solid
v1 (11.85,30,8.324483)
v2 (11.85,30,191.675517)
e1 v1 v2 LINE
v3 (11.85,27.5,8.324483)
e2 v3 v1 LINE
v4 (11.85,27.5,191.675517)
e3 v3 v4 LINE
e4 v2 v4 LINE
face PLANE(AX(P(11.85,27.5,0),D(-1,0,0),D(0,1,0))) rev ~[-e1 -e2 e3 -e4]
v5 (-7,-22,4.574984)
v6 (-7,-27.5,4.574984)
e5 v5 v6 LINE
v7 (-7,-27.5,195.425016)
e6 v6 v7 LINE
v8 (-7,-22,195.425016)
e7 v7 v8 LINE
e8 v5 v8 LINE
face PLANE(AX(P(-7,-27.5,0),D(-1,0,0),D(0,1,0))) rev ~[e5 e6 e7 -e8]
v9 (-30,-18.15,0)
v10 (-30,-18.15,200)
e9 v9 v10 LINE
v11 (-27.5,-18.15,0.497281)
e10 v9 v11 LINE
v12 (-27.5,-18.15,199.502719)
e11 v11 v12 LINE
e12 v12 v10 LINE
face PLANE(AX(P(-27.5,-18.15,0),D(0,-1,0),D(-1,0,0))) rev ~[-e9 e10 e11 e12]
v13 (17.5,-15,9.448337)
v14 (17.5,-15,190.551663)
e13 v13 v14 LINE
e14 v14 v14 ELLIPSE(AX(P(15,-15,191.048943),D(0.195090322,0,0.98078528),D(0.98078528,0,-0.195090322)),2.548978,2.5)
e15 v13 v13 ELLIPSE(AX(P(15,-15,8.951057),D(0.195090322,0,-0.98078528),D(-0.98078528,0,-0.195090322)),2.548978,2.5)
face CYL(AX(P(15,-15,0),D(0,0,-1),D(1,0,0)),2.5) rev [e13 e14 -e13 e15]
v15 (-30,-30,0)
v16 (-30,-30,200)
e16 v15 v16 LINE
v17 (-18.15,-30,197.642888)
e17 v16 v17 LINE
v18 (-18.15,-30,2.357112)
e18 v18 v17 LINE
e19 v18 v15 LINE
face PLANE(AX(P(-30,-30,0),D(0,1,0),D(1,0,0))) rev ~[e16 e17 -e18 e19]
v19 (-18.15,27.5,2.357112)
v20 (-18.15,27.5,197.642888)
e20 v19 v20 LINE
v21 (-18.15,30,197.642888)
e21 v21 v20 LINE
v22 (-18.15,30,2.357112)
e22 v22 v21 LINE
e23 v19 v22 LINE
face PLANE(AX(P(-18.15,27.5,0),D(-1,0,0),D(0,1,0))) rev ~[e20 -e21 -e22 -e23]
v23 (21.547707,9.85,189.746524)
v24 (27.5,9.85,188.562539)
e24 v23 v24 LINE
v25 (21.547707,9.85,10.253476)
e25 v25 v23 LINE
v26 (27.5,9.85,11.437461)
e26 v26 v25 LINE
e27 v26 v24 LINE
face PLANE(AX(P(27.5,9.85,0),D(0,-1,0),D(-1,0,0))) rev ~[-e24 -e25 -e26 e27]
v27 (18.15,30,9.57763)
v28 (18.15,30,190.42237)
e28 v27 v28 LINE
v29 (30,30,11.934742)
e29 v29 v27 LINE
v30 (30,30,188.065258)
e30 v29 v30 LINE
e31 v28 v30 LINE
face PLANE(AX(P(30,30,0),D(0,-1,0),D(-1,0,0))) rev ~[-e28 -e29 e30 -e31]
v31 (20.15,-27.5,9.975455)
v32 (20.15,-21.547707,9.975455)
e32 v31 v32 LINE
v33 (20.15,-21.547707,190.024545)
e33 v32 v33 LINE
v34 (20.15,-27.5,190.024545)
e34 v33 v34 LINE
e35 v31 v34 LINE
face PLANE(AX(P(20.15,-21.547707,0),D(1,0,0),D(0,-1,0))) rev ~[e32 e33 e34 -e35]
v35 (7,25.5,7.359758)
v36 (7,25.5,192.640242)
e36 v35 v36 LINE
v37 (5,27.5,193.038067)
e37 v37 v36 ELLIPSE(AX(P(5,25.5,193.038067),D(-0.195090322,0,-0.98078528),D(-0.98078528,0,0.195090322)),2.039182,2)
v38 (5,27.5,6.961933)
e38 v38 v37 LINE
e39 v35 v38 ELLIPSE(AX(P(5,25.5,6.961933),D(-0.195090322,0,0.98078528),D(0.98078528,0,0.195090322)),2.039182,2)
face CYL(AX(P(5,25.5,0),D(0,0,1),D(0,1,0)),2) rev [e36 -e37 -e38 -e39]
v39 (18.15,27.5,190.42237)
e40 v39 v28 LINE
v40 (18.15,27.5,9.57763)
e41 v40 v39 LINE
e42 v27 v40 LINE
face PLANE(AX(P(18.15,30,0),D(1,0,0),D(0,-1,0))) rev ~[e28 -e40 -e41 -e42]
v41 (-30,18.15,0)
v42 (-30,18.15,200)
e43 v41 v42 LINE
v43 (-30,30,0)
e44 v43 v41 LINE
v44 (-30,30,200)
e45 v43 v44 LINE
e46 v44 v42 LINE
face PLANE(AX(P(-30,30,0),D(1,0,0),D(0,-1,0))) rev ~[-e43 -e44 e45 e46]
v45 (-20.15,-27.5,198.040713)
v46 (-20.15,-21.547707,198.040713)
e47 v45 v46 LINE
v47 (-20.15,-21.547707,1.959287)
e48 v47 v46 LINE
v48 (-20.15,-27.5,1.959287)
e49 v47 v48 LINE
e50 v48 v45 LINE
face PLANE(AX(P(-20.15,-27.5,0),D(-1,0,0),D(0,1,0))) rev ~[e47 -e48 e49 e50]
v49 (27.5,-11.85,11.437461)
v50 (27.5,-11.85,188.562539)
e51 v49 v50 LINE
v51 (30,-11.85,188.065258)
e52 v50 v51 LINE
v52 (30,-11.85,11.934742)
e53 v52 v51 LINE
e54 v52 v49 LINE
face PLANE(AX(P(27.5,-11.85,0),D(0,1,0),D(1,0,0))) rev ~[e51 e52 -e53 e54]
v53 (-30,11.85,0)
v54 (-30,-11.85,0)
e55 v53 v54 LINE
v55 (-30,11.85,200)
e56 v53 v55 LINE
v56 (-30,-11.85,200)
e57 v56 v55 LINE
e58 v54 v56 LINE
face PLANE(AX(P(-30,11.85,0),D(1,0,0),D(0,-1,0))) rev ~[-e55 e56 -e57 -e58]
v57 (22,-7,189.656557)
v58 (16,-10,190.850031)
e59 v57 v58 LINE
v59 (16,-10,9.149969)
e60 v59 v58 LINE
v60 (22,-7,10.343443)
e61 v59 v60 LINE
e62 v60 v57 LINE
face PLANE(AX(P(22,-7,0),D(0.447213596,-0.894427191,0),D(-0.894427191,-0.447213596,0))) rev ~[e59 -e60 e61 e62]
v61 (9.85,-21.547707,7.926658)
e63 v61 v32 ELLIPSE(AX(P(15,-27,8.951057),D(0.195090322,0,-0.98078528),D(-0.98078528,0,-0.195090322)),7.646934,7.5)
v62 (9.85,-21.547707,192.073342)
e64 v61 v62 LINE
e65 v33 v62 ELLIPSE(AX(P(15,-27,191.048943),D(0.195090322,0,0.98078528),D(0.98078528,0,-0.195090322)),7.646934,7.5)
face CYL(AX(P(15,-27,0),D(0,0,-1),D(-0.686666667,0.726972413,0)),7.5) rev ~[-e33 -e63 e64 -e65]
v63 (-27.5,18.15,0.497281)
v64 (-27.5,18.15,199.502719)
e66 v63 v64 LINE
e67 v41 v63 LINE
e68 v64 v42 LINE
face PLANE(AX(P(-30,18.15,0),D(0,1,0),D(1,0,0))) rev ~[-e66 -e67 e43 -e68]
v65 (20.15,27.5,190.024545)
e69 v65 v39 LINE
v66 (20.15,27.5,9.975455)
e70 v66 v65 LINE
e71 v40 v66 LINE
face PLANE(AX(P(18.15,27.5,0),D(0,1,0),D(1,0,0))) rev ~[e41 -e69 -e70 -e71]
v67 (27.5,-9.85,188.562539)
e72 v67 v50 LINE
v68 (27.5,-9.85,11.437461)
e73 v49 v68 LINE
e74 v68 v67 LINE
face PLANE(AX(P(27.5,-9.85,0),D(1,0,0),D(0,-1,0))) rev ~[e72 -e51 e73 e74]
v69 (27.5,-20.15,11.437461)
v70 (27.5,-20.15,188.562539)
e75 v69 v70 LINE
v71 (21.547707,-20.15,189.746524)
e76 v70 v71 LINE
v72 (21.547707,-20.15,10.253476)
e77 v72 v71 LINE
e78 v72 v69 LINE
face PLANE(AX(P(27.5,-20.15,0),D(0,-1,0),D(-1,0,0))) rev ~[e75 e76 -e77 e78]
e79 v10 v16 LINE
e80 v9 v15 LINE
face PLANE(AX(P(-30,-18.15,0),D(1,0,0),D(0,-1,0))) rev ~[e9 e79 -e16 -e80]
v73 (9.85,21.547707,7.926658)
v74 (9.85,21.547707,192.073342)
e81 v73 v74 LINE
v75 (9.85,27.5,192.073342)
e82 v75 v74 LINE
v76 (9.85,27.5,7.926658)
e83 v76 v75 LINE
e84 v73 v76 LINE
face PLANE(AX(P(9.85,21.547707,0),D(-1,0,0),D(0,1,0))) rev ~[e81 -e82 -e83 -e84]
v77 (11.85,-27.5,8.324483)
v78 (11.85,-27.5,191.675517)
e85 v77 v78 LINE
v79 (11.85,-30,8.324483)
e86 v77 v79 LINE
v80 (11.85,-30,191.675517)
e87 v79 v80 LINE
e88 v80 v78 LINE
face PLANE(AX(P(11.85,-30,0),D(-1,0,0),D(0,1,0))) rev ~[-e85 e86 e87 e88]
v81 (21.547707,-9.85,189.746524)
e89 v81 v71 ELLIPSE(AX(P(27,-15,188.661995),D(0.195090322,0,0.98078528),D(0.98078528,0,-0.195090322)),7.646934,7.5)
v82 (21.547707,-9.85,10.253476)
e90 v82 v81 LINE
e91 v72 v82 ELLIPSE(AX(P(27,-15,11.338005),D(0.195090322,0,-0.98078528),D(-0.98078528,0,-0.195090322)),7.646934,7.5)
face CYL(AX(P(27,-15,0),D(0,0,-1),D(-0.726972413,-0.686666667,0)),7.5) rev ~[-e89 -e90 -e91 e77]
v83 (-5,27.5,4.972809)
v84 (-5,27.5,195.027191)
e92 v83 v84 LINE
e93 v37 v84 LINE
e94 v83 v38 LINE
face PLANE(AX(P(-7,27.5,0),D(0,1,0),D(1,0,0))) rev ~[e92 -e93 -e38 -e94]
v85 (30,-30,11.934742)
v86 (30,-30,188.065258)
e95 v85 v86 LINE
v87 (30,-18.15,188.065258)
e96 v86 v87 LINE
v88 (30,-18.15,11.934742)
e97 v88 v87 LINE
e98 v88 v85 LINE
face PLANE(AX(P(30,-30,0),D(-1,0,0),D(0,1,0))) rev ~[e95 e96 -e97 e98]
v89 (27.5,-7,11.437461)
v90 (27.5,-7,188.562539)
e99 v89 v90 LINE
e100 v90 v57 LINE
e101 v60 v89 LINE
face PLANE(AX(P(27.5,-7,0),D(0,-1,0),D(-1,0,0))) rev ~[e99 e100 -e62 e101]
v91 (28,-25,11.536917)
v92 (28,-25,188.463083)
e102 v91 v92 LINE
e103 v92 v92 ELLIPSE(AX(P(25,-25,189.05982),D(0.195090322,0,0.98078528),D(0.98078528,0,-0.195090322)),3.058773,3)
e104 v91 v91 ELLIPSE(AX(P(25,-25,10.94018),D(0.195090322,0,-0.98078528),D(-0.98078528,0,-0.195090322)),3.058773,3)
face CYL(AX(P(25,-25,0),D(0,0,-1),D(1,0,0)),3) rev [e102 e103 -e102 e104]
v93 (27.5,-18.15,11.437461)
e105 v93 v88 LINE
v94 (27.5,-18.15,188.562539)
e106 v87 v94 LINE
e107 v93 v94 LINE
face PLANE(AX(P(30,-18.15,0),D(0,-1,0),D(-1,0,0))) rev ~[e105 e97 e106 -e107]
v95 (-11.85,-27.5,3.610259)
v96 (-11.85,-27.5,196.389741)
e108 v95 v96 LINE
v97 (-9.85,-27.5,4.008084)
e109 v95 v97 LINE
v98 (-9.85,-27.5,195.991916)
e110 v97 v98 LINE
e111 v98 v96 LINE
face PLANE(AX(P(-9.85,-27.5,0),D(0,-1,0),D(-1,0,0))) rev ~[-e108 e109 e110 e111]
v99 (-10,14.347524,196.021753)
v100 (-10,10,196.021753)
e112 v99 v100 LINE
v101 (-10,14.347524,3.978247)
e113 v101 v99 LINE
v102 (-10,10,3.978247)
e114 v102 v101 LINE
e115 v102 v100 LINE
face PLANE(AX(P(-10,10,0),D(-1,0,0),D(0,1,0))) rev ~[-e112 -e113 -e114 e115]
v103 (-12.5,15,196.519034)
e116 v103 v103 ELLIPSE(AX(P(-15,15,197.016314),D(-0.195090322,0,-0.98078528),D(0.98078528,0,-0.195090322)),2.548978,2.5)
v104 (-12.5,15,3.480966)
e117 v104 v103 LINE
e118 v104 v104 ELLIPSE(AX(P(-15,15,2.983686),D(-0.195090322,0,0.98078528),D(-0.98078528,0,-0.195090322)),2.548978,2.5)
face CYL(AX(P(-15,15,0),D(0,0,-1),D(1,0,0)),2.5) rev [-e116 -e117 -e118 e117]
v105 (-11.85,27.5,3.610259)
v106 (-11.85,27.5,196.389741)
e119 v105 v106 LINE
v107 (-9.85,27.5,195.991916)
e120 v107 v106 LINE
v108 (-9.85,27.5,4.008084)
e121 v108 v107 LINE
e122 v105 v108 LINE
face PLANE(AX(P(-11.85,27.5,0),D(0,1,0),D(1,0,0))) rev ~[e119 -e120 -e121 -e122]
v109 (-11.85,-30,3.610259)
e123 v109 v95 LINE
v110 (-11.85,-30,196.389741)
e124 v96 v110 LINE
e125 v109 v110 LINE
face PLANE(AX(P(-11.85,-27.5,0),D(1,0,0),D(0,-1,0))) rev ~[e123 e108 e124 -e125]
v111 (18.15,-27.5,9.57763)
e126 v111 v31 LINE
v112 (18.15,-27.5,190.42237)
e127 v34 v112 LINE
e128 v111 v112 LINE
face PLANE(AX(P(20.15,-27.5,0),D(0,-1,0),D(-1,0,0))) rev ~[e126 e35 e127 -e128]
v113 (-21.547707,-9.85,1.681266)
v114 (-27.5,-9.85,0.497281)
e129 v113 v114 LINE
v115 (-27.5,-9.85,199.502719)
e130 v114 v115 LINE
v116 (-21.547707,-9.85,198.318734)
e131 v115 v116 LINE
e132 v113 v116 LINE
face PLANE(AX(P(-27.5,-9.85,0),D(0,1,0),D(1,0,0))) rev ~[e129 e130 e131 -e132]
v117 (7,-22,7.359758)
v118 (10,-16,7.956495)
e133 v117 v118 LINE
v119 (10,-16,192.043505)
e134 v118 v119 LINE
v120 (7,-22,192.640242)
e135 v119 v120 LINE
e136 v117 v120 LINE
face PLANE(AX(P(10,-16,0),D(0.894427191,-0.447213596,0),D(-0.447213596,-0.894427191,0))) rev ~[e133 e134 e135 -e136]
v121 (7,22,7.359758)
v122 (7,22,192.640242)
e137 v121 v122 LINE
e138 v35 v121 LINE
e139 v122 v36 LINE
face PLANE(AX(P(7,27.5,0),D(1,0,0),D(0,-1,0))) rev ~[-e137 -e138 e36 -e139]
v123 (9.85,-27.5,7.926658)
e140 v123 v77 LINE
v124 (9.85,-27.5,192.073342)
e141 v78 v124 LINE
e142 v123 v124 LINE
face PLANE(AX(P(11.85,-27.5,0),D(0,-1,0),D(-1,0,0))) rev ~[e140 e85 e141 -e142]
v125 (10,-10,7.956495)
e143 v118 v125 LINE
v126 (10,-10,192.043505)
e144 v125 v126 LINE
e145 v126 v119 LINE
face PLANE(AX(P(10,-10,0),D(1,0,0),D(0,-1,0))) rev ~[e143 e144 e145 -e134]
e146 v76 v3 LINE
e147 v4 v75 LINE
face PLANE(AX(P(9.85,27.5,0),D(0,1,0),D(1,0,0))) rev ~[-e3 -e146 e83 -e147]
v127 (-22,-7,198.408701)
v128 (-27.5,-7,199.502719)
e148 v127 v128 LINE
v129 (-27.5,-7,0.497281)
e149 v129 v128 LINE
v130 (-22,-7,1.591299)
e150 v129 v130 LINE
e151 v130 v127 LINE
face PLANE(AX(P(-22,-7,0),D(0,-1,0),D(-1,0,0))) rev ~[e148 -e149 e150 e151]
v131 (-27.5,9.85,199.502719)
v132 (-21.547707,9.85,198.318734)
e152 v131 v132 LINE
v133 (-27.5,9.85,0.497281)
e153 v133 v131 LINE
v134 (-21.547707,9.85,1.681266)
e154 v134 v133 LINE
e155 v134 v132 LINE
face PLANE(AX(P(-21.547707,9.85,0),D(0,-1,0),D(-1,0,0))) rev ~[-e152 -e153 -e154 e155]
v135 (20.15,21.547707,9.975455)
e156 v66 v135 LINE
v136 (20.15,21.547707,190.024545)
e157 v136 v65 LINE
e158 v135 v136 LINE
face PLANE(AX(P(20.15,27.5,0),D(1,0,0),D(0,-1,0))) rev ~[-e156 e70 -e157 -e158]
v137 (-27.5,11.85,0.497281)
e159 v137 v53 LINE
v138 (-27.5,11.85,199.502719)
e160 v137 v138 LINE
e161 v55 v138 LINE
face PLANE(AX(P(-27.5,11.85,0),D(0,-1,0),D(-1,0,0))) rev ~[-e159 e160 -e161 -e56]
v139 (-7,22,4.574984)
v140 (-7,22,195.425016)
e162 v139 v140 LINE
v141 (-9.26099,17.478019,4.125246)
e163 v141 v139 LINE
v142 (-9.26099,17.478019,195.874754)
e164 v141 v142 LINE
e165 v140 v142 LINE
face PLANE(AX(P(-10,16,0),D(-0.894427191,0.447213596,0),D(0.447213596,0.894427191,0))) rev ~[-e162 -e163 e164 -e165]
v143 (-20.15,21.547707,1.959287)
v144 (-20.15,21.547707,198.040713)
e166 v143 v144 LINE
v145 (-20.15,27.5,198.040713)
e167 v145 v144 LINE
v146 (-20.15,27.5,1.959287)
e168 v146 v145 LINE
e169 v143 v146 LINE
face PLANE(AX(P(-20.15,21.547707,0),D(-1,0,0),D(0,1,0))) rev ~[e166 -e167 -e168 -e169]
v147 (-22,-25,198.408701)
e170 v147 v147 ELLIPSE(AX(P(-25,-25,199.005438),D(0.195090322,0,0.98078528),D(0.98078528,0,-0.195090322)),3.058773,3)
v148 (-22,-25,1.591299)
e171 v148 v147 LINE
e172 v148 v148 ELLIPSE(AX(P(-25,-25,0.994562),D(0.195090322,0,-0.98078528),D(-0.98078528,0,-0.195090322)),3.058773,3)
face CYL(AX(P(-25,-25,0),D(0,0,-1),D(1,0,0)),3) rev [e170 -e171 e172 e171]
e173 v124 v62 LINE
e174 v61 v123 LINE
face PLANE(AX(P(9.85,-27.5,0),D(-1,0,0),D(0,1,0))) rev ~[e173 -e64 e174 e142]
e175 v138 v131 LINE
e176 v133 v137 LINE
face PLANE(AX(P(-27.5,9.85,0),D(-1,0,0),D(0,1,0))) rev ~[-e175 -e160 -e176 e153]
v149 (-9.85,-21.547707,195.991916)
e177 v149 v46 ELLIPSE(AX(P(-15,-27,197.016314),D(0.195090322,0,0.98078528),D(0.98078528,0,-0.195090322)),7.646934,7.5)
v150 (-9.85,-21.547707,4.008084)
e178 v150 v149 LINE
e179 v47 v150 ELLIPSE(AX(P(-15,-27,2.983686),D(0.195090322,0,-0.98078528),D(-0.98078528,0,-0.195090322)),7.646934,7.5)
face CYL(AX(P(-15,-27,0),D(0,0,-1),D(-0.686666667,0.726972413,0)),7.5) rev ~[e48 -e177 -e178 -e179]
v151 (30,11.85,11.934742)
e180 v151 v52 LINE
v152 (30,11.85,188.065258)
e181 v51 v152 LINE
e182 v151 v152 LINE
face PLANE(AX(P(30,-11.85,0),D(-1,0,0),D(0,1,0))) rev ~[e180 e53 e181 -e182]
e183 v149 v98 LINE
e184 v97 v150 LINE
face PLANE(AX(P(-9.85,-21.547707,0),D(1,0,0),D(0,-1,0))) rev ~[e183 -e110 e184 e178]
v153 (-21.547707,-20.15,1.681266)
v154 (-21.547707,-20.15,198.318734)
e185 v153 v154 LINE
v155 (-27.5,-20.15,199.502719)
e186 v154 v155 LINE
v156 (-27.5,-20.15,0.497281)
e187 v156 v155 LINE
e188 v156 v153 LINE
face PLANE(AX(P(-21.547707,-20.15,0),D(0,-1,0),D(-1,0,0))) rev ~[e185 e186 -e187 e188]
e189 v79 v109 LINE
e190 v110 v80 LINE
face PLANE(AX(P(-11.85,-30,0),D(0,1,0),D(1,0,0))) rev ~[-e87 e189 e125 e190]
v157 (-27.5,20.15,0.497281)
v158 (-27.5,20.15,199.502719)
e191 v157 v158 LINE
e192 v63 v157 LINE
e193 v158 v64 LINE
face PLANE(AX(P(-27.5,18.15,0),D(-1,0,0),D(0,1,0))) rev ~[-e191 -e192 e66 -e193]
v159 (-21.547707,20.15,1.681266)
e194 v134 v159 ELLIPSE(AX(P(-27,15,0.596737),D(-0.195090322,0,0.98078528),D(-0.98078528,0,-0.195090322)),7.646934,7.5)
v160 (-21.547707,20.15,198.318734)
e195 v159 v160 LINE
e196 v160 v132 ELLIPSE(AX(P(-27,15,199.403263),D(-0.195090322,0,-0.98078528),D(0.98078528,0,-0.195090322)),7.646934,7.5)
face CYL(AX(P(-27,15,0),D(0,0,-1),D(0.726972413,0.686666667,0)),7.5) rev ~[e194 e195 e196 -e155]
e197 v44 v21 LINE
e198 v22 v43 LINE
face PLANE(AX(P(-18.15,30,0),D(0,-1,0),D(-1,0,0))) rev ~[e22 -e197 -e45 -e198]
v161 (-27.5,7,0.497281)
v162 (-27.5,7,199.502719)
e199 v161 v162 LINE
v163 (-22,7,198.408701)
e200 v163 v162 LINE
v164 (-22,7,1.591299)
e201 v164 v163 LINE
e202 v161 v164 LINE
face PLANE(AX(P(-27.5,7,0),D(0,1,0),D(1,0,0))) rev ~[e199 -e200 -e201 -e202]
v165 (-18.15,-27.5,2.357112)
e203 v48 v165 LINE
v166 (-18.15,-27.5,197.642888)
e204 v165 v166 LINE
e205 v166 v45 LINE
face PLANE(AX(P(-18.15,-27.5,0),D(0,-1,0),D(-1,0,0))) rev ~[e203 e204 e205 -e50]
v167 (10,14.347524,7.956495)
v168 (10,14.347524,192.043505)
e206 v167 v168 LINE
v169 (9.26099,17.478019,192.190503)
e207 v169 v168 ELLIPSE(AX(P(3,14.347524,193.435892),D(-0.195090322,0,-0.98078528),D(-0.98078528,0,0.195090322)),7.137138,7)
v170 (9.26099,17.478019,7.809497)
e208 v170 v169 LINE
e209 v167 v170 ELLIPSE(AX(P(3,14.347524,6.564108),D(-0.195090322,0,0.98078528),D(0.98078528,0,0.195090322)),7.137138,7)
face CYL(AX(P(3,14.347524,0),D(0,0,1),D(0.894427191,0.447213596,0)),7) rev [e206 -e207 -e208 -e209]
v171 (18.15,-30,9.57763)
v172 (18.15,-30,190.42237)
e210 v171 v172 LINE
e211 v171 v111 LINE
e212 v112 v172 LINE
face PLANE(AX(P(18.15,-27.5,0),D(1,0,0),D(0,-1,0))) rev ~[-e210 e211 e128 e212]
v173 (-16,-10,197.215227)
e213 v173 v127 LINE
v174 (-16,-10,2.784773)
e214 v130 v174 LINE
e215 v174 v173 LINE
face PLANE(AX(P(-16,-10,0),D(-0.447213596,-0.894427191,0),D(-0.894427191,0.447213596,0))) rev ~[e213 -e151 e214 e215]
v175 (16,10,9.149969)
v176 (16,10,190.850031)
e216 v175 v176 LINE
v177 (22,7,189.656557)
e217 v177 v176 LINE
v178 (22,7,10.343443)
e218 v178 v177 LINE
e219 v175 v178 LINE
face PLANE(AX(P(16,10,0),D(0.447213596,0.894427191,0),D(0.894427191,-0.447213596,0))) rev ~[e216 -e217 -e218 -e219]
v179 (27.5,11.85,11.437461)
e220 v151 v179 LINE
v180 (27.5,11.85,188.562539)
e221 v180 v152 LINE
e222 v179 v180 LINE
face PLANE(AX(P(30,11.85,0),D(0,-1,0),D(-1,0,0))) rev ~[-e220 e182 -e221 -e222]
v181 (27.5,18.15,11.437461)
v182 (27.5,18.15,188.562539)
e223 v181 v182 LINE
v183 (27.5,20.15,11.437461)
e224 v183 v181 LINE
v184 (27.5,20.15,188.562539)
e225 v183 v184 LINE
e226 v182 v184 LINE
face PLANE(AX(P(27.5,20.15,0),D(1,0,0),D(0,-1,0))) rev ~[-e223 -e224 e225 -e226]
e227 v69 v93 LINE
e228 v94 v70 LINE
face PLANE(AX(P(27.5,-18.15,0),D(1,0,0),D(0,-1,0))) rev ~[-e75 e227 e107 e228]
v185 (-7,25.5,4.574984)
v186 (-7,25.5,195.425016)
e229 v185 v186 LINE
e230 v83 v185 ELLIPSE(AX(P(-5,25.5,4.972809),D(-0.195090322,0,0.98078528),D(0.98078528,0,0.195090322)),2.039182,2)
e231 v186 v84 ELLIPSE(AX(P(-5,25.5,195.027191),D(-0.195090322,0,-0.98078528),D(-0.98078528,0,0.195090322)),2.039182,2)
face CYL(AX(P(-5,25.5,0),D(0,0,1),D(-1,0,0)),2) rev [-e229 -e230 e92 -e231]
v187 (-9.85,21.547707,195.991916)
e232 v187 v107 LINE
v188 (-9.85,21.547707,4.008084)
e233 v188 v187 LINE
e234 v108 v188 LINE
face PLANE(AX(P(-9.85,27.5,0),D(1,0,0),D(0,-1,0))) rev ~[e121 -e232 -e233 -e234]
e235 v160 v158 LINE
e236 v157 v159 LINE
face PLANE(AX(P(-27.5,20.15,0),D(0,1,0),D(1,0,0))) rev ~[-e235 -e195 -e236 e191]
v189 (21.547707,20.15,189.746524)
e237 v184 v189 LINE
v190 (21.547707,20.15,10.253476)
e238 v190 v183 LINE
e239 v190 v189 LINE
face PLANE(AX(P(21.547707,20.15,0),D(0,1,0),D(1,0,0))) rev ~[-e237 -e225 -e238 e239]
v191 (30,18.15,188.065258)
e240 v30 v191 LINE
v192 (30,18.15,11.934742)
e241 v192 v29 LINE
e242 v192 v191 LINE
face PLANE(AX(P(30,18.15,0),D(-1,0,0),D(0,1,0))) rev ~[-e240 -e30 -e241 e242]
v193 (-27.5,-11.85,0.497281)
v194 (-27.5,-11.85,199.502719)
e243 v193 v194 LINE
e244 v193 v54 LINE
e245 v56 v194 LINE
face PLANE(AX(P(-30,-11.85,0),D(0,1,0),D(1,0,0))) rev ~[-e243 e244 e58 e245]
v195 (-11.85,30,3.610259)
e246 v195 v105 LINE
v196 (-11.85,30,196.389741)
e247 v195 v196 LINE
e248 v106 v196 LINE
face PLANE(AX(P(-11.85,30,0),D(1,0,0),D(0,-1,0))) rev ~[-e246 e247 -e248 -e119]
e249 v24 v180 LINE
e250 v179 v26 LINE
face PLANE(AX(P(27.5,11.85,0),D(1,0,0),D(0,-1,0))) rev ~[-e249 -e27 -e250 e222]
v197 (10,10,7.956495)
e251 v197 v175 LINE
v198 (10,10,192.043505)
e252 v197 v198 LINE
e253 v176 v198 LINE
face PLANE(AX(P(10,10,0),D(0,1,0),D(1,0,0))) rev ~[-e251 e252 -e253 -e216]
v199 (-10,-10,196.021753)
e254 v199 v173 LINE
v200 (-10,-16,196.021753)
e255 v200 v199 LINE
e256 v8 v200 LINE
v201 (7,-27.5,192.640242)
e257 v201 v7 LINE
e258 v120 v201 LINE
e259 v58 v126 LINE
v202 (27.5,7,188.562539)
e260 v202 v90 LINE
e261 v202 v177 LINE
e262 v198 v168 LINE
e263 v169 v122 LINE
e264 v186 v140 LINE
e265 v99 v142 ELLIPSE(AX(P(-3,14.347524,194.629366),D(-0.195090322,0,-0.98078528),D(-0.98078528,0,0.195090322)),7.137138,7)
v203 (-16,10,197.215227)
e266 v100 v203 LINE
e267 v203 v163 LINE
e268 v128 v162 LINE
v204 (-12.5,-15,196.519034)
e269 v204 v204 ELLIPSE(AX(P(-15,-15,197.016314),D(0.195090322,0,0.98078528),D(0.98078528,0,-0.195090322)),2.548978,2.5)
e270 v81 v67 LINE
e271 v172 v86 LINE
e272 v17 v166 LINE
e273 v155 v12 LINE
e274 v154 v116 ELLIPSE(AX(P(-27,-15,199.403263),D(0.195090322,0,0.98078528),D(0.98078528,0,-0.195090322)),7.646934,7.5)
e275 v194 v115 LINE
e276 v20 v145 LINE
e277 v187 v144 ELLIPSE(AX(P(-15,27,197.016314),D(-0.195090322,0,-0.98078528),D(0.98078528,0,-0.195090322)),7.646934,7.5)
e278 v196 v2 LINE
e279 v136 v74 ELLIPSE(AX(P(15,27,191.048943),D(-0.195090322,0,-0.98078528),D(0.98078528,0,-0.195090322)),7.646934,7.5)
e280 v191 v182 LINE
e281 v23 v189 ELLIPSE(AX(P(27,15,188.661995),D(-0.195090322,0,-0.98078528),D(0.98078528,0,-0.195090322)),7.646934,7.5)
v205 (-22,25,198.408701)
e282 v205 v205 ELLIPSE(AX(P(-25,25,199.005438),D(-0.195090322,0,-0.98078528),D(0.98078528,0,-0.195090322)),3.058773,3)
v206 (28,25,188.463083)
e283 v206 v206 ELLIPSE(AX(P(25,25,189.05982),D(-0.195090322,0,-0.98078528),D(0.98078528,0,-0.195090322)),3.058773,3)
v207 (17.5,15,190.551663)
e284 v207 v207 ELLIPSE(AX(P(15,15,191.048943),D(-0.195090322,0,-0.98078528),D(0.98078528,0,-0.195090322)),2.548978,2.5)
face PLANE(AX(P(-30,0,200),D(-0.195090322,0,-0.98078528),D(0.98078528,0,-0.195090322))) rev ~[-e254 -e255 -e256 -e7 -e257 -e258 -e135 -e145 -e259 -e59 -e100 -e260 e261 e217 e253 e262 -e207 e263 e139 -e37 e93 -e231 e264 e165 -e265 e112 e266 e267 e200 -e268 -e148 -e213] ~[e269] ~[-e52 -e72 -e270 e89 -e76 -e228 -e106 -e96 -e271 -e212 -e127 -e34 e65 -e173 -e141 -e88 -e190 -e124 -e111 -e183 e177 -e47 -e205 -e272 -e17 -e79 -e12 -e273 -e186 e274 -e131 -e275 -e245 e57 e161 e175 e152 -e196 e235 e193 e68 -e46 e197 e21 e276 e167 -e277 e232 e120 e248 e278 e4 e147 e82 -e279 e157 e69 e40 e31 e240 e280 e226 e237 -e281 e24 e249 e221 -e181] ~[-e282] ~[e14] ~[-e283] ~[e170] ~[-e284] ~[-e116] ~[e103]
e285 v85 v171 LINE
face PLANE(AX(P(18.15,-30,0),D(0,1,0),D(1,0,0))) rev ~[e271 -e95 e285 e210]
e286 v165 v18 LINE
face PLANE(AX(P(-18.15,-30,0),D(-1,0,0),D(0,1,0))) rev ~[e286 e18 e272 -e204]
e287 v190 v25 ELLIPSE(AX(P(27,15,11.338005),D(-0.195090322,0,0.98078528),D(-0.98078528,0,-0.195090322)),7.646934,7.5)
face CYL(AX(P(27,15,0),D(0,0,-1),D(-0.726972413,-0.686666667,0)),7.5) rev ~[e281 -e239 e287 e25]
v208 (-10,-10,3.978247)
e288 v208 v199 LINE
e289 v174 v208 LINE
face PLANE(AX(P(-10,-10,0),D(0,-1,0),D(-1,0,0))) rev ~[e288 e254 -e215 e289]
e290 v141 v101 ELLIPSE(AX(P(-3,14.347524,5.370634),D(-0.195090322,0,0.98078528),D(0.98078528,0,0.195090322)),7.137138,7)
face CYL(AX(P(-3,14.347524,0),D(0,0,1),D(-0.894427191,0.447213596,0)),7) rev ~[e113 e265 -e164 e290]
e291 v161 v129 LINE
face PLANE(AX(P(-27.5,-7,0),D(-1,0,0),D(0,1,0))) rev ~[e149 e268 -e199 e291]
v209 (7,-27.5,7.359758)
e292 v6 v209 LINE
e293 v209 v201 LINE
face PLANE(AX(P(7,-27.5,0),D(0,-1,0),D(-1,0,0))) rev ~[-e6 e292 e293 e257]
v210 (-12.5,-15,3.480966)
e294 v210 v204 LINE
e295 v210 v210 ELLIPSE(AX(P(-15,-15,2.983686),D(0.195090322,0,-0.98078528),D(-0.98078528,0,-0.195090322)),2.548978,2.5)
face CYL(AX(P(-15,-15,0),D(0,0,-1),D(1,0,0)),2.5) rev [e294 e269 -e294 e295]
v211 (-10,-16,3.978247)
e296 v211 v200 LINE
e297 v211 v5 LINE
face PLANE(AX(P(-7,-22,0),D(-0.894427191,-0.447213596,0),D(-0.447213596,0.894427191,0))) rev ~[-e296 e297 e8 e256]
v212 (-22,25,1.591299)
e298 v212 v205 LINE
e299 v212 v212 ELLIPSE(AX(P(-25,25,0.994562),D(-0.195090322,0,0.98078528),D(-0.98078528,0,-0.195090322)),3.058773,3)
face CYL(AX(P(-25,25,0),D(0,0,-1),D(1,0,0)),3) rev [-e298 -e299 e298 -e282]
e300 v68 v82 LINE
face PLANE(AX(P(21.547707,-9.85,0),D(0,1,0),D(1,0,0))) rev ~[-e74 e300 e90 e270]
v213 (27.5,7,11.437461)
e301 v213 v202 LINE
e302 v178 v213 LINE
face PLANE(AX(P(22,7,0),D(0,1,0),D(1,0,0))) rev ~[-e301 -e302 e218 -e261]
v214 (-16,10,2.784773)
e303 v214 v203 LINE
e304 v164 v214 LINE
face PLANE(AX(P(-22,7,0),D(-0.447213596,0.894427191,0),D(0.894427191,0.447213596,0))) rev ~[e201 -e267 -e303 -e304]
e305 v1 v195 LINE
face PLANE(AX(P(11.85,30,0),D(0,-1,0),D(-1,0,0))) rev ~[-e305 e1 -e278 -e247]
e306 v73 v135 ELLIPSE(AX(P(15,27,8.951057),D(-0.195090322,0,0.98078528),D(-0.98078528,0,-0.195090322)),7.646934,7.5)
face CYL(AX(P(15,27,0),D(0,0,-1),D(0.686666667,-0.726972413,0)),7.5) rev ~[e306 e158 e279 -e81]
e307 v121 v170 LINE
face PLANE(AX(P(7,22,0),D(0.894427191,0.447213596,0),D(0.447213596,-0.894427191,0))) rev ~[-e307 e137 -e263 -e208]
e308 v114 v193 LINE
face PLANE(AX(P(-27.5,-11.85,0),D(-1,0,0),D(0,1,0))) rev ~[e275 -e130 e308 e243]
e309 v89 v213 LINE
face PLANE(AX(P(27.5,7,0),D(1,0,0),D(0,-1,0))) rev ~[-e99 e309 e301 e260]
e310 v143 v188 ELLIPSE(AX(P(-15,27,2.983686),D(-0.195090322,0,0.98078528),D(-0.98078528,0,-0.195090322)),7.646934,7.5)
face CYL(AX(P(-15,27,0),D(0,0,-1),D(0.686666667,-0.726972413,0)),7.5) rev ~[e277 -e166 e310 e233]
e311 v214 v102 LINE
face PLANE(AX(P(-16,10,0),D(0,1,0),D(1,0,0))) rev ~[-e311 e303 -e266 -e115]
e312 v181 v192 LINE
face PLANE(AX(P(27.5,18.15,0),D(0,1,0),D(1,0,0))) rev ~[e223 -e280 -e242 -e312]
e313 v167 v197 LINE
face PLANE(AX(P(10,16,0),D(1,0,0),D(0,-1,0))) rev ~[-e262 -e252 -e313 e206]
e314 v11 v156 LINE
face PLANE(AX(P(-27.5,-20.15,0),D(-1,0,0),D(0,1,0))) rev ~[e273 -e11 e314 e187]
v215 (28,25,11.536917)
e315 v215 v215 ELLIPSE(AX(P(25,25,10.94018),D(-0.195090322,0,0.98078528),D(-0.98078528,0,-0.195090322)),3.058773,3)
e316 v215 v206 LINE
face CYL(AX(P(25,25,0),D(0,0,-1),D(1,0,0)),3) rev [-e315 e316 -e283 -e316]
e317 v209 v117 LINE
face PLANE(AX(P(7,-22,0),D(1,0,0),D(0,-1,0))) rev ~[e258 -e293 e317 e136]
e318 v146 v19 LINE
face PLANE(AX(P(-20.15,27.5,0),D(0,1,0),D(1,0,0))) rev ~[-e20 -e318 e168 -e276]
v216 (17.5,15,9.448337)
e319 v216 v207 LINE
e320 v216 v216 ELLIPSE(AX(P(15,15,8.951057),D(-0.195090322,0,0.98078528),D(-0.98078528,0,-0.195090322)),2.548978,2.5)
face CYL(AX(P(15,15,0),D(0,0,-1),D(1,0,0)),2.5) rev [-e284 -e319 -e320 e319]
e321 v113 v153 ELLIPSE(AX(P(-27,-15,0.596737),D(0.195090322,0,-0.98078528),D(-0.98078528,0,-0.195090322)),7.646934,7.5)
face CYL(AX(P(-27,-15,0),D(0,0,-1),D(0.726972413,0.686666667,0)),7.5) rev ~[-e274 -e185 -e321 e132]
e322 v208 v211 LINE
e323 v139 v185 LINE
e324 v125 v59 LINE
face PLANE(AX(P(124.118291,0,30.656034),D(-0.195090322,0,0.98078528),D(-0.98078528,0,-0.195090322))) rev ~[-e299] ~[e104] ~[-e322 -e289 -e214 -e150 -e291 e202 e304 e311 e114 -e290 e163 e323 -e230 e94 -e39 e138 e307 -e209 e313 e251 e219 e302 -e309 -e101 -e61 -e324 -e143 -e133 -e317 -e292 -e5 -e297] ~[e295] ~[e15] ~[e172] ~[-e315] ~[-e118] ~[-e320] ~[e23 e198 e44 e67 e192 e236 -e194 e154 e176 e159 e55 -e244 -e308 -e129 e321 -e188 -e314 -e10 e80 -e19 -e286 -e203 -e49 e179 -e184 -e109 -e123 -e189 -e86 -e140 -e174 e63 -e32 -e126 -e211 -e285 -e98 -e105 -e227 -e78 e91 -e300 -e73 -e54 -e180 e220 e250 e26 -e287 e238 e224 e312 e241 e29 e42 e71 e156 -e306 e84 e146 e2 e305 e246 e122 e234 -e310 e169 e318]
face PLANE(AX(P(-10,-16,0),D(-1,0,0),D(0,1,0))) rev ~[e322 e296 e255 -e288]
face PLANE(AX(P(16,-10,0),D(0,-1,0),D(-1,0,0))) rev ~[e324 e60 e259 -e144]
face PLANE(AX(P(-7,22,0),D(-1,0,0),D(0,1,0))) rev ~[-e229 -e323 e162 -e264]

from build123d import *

# Parameters (mm, degrees)
F0_R          = 3
F0_R_2        = 2.5
F1_DEPTH      = 200
F2_R          = 2
F3_R          = 7
F6_DEPTH      = 30
F6_DEPTH_BACK = 30


# Not quite as in the source:
# - a feature names something its author has since deleted; it is built from what else it names


with BuildPart() as f1:
    # F0 (on Top) → F1 (new body)
    with BuildSketch(Plane.XY):
        with BuildLine():
            Line((18.15, -30), (30, -30))
            Line((30, -30), (30, -18.15))
            Line((30, -18.15), (27.5, -18.15))
            Line((27.5, -18.15), (27.5, -20.15))
            Line((27.5, -20.15), (21.5477069044, -20.15))
            ThreePointArc((21.5477069044, -20.15), (19.5, -15), (21.5477069044, -9.85))
            Line((21.5477069044, -9.85), (27.5, -9.85))
            Line((27.5, -9.85), (27.5, -11.85))
            Line((27.5, -11.85), (30, -11.85))
            Line((30, -11.85), (30, 11.85))
            Line((30, 11.85), (27.5, 11.85))
            Line((27.5, 11.85), (27.5, 9.85))
            Line((27.5, 9.85), (21.5477069044, 9.85))
            ThreePointArc((21.5477069044, 9.85), (19.5, 15), (21.5477069044, 20.15))
            Line((21.5477069044, 20.15), (27.5, 20.15))
            Line((27.5, 20.15), (27.5, 18.15))
            Line((27.5, 18.15), (30, 18.15))
            Line((30, 18.15), (30, 30))
            Line((30, 30), (18.15, 30))
            Line((18.15, 30), (18.15, 27.5))
            Line((18.15, 27.5), (20.15, 27.5))
            Line((20.15, 27.5), (20.15, 21.5477069044))
            ThreePointArc((20.15, 21.5477069044), (15, 19.5), (9.85, 21.5477069044))
            Line((9.85, 21.5477069044), (9.85, 27.5))
            Line((9.85, 27.5), (11.85, 27.5))
            Line((11.85, 27.5), (11.85, 30))
            Line((11.85, 30), (-11.85, 30))
            Line((-11.85, 30), (-11.85, 27.5))
            Line((-11.85, 27.5), (-9.85, 27.5))
            Line((-9.85, 27.5), (-9.85, 21.5477069044))
            ThreePointArc((-9.85, 21.5477069044), (-15, 19.5), (-20.15, 21.5477069044))
            Line((-20.15, 21.5477069044), (-20.15, 27.5))
            Line((-20.15, 27.5), (-18.15, 27.5))
            Line((-18.15, 27.5), (-18.15, 30))
            Line((-18.15, 30), (-30, 30))
            Line((-30, 30), (-30, 18.15))
            Line((-30, 18.15), (-27.5, 18.15))
            Line((-27.5, 18.15), (-27.5, 20.15))
            Line((-27.5, 20.15), (-21.5477069044, 20.15))
            ThreePointArc((-21.5477069044, 20.15), (-19.5, 15), (-21.5477069044, 9.85))
            Line((-21.5477069044, 9.85), (-27.5, 9.85))
            Line((-27.5, 9.85), (-27.5, 11.85))
            Line((-27.5, 11.85), (-30, 11.85))
            Line((-30, 11.85), (-30, -11.85))
            Line((-30, -11.85), (-27.5, -11.85))
            Line((-27.5, -11.85), (-27.5, -9.85))
            Line((-27.5, -9.85), (-21.5477069044, -9.85))
            ThreePointArc((-21.5477069044, -9.85), (-19.5, -15), (-21.5477069044, -20.15))
            Line((-21.5477069044, -20.15), (-27.5, -20.15))
            Line((-27.5, -20.15), (-27.5, -18.15))
            Line((-27.5, -18.15), (-30, -18.15))
            Line((-30, -18.15), (-30, -30))
            Line((-30, -30), (-18.15, -30))
            Line((-18.15, -30), (-18.15, -27.5))
            Line((-18.15, -27.5), (-20.15, -27.5))
            Line((-20.15, -27.5), (-20.15, -21.5477069044))
            ThreePointArc((-20.15, -21.5477069044), (-15, -19.5), (-9.85, -21.5477069044))
            Line((-9.85, -21.5477069044), (-9.85, -27.5))
            Line((-9.85, -27.5), (-11.85, -27.5))
            Line((-11.85, -27.5), (-11.85, -30))
            Line((-11.85, -30), (11.85, -30))
            Line((11.85, -30), (11.85, -27.5))
            Line((11.85, -27.5), (9.85, -27.5))
            Line((9.85, -27.5), (9.85, -21.5477069044))
            ThreePointArc((9.85, -21.5477069044), (15, -19.5), (20.15, -21.5477069044))
            Line((20.15, -21.5477069044), (20.15, -27.5))
            Line((20.15, -27.5), (18.15, -27.5))
            Line((18.15, -27.5), (18.15, -30))
        make_face()
        with Locations((-25, -25)):
            Circle(F0_R, mode=Mode.SUBTRACT)
        with Locations((-15, -15)):
            Circle(F0_R_2, mode=Mode.SUBTRACT)
        with Locations((25, -25)):
            Circle(F0_R, mode=Mode.SUBTRACT)
        with Locations((15, -15)):
            Circle(F0_R_2, mode=Mode.SUBTRACT)
        with Locations((-25, 25)):
            Circle(F0_R, mode=Mode.SUBTRACT)
        with Locations((-15, 15)):
            Circle(F0_R_2, mode=Mode.SUBTRACT)
        Polygon((-7, 22), (-7, 27.5), (0, 27.5), (7, 27.5), (7, 22), (10, 16), (10, 10), (16, 10), (22, 7), (27.5, 7), (27.5, 0), (27.5, -7), (22, -7), (16, -10), (10, -10), (10, -16), (7, -22), (7, -27.5), (0, -27.5), (-7, -27.5), (-7, -22), (-10, -16), (-10, -10), (-16, -10), (-22, -7), (-27.5, -7), (-27.5, 0), (-27.5, 7), (-22, 7), (-16, 10), (-10, 10), (-10, 16), align=None, mode=Mode.SUBTRACT)
        with Locations((15, 15)):
            Circle(F0_R_2, mode=Mode.SUBTRACT)
        with Locations((25, 25)):
            Circle(F0_R, mode=Mode.SUBTRACT)
    extrude(amount=F1_DEPTH)

    # F2
    f2_edges = [f1.edges().sort_by_distance(p)[0] for p in [
        (-7, 27.5, 100),
        (7, 27.5, 100),
    ]]
    fillet(f2_edges, radius=F2_R)

    # F3
    f3_edges = [f1.edges().sort_by_distance(p)[0] for p in [
        (-10, 16, 100),
        (10, 16, 100),
    ]]
    fillet(f3_edges, radius=F3_R)

    # F5 (on Front) → F6 (cut, two sides)
    with BuildSketch(Plane.XZ) as f6_sk:
        Polygon((161.6827257777, -158.1931300344), (124.1182914407, 30.656034207), (-30, 0), (7.5644343369, -188.8491642414), align=None)
        Polygon((119.7769204661, 170.2075181713), (153.4553825462, 339.5205806204), (3.6784620801, 369.3130624492), (-30, 200), align=None)
    extrude(amount=F6_DEPTH, mode=Mode.SUBTRACT)
    extrude(f6_sk.sketch, amount=-F6_DEPTH_BACK, mode=Mode.SUBTRACT)


solid = f1.part
